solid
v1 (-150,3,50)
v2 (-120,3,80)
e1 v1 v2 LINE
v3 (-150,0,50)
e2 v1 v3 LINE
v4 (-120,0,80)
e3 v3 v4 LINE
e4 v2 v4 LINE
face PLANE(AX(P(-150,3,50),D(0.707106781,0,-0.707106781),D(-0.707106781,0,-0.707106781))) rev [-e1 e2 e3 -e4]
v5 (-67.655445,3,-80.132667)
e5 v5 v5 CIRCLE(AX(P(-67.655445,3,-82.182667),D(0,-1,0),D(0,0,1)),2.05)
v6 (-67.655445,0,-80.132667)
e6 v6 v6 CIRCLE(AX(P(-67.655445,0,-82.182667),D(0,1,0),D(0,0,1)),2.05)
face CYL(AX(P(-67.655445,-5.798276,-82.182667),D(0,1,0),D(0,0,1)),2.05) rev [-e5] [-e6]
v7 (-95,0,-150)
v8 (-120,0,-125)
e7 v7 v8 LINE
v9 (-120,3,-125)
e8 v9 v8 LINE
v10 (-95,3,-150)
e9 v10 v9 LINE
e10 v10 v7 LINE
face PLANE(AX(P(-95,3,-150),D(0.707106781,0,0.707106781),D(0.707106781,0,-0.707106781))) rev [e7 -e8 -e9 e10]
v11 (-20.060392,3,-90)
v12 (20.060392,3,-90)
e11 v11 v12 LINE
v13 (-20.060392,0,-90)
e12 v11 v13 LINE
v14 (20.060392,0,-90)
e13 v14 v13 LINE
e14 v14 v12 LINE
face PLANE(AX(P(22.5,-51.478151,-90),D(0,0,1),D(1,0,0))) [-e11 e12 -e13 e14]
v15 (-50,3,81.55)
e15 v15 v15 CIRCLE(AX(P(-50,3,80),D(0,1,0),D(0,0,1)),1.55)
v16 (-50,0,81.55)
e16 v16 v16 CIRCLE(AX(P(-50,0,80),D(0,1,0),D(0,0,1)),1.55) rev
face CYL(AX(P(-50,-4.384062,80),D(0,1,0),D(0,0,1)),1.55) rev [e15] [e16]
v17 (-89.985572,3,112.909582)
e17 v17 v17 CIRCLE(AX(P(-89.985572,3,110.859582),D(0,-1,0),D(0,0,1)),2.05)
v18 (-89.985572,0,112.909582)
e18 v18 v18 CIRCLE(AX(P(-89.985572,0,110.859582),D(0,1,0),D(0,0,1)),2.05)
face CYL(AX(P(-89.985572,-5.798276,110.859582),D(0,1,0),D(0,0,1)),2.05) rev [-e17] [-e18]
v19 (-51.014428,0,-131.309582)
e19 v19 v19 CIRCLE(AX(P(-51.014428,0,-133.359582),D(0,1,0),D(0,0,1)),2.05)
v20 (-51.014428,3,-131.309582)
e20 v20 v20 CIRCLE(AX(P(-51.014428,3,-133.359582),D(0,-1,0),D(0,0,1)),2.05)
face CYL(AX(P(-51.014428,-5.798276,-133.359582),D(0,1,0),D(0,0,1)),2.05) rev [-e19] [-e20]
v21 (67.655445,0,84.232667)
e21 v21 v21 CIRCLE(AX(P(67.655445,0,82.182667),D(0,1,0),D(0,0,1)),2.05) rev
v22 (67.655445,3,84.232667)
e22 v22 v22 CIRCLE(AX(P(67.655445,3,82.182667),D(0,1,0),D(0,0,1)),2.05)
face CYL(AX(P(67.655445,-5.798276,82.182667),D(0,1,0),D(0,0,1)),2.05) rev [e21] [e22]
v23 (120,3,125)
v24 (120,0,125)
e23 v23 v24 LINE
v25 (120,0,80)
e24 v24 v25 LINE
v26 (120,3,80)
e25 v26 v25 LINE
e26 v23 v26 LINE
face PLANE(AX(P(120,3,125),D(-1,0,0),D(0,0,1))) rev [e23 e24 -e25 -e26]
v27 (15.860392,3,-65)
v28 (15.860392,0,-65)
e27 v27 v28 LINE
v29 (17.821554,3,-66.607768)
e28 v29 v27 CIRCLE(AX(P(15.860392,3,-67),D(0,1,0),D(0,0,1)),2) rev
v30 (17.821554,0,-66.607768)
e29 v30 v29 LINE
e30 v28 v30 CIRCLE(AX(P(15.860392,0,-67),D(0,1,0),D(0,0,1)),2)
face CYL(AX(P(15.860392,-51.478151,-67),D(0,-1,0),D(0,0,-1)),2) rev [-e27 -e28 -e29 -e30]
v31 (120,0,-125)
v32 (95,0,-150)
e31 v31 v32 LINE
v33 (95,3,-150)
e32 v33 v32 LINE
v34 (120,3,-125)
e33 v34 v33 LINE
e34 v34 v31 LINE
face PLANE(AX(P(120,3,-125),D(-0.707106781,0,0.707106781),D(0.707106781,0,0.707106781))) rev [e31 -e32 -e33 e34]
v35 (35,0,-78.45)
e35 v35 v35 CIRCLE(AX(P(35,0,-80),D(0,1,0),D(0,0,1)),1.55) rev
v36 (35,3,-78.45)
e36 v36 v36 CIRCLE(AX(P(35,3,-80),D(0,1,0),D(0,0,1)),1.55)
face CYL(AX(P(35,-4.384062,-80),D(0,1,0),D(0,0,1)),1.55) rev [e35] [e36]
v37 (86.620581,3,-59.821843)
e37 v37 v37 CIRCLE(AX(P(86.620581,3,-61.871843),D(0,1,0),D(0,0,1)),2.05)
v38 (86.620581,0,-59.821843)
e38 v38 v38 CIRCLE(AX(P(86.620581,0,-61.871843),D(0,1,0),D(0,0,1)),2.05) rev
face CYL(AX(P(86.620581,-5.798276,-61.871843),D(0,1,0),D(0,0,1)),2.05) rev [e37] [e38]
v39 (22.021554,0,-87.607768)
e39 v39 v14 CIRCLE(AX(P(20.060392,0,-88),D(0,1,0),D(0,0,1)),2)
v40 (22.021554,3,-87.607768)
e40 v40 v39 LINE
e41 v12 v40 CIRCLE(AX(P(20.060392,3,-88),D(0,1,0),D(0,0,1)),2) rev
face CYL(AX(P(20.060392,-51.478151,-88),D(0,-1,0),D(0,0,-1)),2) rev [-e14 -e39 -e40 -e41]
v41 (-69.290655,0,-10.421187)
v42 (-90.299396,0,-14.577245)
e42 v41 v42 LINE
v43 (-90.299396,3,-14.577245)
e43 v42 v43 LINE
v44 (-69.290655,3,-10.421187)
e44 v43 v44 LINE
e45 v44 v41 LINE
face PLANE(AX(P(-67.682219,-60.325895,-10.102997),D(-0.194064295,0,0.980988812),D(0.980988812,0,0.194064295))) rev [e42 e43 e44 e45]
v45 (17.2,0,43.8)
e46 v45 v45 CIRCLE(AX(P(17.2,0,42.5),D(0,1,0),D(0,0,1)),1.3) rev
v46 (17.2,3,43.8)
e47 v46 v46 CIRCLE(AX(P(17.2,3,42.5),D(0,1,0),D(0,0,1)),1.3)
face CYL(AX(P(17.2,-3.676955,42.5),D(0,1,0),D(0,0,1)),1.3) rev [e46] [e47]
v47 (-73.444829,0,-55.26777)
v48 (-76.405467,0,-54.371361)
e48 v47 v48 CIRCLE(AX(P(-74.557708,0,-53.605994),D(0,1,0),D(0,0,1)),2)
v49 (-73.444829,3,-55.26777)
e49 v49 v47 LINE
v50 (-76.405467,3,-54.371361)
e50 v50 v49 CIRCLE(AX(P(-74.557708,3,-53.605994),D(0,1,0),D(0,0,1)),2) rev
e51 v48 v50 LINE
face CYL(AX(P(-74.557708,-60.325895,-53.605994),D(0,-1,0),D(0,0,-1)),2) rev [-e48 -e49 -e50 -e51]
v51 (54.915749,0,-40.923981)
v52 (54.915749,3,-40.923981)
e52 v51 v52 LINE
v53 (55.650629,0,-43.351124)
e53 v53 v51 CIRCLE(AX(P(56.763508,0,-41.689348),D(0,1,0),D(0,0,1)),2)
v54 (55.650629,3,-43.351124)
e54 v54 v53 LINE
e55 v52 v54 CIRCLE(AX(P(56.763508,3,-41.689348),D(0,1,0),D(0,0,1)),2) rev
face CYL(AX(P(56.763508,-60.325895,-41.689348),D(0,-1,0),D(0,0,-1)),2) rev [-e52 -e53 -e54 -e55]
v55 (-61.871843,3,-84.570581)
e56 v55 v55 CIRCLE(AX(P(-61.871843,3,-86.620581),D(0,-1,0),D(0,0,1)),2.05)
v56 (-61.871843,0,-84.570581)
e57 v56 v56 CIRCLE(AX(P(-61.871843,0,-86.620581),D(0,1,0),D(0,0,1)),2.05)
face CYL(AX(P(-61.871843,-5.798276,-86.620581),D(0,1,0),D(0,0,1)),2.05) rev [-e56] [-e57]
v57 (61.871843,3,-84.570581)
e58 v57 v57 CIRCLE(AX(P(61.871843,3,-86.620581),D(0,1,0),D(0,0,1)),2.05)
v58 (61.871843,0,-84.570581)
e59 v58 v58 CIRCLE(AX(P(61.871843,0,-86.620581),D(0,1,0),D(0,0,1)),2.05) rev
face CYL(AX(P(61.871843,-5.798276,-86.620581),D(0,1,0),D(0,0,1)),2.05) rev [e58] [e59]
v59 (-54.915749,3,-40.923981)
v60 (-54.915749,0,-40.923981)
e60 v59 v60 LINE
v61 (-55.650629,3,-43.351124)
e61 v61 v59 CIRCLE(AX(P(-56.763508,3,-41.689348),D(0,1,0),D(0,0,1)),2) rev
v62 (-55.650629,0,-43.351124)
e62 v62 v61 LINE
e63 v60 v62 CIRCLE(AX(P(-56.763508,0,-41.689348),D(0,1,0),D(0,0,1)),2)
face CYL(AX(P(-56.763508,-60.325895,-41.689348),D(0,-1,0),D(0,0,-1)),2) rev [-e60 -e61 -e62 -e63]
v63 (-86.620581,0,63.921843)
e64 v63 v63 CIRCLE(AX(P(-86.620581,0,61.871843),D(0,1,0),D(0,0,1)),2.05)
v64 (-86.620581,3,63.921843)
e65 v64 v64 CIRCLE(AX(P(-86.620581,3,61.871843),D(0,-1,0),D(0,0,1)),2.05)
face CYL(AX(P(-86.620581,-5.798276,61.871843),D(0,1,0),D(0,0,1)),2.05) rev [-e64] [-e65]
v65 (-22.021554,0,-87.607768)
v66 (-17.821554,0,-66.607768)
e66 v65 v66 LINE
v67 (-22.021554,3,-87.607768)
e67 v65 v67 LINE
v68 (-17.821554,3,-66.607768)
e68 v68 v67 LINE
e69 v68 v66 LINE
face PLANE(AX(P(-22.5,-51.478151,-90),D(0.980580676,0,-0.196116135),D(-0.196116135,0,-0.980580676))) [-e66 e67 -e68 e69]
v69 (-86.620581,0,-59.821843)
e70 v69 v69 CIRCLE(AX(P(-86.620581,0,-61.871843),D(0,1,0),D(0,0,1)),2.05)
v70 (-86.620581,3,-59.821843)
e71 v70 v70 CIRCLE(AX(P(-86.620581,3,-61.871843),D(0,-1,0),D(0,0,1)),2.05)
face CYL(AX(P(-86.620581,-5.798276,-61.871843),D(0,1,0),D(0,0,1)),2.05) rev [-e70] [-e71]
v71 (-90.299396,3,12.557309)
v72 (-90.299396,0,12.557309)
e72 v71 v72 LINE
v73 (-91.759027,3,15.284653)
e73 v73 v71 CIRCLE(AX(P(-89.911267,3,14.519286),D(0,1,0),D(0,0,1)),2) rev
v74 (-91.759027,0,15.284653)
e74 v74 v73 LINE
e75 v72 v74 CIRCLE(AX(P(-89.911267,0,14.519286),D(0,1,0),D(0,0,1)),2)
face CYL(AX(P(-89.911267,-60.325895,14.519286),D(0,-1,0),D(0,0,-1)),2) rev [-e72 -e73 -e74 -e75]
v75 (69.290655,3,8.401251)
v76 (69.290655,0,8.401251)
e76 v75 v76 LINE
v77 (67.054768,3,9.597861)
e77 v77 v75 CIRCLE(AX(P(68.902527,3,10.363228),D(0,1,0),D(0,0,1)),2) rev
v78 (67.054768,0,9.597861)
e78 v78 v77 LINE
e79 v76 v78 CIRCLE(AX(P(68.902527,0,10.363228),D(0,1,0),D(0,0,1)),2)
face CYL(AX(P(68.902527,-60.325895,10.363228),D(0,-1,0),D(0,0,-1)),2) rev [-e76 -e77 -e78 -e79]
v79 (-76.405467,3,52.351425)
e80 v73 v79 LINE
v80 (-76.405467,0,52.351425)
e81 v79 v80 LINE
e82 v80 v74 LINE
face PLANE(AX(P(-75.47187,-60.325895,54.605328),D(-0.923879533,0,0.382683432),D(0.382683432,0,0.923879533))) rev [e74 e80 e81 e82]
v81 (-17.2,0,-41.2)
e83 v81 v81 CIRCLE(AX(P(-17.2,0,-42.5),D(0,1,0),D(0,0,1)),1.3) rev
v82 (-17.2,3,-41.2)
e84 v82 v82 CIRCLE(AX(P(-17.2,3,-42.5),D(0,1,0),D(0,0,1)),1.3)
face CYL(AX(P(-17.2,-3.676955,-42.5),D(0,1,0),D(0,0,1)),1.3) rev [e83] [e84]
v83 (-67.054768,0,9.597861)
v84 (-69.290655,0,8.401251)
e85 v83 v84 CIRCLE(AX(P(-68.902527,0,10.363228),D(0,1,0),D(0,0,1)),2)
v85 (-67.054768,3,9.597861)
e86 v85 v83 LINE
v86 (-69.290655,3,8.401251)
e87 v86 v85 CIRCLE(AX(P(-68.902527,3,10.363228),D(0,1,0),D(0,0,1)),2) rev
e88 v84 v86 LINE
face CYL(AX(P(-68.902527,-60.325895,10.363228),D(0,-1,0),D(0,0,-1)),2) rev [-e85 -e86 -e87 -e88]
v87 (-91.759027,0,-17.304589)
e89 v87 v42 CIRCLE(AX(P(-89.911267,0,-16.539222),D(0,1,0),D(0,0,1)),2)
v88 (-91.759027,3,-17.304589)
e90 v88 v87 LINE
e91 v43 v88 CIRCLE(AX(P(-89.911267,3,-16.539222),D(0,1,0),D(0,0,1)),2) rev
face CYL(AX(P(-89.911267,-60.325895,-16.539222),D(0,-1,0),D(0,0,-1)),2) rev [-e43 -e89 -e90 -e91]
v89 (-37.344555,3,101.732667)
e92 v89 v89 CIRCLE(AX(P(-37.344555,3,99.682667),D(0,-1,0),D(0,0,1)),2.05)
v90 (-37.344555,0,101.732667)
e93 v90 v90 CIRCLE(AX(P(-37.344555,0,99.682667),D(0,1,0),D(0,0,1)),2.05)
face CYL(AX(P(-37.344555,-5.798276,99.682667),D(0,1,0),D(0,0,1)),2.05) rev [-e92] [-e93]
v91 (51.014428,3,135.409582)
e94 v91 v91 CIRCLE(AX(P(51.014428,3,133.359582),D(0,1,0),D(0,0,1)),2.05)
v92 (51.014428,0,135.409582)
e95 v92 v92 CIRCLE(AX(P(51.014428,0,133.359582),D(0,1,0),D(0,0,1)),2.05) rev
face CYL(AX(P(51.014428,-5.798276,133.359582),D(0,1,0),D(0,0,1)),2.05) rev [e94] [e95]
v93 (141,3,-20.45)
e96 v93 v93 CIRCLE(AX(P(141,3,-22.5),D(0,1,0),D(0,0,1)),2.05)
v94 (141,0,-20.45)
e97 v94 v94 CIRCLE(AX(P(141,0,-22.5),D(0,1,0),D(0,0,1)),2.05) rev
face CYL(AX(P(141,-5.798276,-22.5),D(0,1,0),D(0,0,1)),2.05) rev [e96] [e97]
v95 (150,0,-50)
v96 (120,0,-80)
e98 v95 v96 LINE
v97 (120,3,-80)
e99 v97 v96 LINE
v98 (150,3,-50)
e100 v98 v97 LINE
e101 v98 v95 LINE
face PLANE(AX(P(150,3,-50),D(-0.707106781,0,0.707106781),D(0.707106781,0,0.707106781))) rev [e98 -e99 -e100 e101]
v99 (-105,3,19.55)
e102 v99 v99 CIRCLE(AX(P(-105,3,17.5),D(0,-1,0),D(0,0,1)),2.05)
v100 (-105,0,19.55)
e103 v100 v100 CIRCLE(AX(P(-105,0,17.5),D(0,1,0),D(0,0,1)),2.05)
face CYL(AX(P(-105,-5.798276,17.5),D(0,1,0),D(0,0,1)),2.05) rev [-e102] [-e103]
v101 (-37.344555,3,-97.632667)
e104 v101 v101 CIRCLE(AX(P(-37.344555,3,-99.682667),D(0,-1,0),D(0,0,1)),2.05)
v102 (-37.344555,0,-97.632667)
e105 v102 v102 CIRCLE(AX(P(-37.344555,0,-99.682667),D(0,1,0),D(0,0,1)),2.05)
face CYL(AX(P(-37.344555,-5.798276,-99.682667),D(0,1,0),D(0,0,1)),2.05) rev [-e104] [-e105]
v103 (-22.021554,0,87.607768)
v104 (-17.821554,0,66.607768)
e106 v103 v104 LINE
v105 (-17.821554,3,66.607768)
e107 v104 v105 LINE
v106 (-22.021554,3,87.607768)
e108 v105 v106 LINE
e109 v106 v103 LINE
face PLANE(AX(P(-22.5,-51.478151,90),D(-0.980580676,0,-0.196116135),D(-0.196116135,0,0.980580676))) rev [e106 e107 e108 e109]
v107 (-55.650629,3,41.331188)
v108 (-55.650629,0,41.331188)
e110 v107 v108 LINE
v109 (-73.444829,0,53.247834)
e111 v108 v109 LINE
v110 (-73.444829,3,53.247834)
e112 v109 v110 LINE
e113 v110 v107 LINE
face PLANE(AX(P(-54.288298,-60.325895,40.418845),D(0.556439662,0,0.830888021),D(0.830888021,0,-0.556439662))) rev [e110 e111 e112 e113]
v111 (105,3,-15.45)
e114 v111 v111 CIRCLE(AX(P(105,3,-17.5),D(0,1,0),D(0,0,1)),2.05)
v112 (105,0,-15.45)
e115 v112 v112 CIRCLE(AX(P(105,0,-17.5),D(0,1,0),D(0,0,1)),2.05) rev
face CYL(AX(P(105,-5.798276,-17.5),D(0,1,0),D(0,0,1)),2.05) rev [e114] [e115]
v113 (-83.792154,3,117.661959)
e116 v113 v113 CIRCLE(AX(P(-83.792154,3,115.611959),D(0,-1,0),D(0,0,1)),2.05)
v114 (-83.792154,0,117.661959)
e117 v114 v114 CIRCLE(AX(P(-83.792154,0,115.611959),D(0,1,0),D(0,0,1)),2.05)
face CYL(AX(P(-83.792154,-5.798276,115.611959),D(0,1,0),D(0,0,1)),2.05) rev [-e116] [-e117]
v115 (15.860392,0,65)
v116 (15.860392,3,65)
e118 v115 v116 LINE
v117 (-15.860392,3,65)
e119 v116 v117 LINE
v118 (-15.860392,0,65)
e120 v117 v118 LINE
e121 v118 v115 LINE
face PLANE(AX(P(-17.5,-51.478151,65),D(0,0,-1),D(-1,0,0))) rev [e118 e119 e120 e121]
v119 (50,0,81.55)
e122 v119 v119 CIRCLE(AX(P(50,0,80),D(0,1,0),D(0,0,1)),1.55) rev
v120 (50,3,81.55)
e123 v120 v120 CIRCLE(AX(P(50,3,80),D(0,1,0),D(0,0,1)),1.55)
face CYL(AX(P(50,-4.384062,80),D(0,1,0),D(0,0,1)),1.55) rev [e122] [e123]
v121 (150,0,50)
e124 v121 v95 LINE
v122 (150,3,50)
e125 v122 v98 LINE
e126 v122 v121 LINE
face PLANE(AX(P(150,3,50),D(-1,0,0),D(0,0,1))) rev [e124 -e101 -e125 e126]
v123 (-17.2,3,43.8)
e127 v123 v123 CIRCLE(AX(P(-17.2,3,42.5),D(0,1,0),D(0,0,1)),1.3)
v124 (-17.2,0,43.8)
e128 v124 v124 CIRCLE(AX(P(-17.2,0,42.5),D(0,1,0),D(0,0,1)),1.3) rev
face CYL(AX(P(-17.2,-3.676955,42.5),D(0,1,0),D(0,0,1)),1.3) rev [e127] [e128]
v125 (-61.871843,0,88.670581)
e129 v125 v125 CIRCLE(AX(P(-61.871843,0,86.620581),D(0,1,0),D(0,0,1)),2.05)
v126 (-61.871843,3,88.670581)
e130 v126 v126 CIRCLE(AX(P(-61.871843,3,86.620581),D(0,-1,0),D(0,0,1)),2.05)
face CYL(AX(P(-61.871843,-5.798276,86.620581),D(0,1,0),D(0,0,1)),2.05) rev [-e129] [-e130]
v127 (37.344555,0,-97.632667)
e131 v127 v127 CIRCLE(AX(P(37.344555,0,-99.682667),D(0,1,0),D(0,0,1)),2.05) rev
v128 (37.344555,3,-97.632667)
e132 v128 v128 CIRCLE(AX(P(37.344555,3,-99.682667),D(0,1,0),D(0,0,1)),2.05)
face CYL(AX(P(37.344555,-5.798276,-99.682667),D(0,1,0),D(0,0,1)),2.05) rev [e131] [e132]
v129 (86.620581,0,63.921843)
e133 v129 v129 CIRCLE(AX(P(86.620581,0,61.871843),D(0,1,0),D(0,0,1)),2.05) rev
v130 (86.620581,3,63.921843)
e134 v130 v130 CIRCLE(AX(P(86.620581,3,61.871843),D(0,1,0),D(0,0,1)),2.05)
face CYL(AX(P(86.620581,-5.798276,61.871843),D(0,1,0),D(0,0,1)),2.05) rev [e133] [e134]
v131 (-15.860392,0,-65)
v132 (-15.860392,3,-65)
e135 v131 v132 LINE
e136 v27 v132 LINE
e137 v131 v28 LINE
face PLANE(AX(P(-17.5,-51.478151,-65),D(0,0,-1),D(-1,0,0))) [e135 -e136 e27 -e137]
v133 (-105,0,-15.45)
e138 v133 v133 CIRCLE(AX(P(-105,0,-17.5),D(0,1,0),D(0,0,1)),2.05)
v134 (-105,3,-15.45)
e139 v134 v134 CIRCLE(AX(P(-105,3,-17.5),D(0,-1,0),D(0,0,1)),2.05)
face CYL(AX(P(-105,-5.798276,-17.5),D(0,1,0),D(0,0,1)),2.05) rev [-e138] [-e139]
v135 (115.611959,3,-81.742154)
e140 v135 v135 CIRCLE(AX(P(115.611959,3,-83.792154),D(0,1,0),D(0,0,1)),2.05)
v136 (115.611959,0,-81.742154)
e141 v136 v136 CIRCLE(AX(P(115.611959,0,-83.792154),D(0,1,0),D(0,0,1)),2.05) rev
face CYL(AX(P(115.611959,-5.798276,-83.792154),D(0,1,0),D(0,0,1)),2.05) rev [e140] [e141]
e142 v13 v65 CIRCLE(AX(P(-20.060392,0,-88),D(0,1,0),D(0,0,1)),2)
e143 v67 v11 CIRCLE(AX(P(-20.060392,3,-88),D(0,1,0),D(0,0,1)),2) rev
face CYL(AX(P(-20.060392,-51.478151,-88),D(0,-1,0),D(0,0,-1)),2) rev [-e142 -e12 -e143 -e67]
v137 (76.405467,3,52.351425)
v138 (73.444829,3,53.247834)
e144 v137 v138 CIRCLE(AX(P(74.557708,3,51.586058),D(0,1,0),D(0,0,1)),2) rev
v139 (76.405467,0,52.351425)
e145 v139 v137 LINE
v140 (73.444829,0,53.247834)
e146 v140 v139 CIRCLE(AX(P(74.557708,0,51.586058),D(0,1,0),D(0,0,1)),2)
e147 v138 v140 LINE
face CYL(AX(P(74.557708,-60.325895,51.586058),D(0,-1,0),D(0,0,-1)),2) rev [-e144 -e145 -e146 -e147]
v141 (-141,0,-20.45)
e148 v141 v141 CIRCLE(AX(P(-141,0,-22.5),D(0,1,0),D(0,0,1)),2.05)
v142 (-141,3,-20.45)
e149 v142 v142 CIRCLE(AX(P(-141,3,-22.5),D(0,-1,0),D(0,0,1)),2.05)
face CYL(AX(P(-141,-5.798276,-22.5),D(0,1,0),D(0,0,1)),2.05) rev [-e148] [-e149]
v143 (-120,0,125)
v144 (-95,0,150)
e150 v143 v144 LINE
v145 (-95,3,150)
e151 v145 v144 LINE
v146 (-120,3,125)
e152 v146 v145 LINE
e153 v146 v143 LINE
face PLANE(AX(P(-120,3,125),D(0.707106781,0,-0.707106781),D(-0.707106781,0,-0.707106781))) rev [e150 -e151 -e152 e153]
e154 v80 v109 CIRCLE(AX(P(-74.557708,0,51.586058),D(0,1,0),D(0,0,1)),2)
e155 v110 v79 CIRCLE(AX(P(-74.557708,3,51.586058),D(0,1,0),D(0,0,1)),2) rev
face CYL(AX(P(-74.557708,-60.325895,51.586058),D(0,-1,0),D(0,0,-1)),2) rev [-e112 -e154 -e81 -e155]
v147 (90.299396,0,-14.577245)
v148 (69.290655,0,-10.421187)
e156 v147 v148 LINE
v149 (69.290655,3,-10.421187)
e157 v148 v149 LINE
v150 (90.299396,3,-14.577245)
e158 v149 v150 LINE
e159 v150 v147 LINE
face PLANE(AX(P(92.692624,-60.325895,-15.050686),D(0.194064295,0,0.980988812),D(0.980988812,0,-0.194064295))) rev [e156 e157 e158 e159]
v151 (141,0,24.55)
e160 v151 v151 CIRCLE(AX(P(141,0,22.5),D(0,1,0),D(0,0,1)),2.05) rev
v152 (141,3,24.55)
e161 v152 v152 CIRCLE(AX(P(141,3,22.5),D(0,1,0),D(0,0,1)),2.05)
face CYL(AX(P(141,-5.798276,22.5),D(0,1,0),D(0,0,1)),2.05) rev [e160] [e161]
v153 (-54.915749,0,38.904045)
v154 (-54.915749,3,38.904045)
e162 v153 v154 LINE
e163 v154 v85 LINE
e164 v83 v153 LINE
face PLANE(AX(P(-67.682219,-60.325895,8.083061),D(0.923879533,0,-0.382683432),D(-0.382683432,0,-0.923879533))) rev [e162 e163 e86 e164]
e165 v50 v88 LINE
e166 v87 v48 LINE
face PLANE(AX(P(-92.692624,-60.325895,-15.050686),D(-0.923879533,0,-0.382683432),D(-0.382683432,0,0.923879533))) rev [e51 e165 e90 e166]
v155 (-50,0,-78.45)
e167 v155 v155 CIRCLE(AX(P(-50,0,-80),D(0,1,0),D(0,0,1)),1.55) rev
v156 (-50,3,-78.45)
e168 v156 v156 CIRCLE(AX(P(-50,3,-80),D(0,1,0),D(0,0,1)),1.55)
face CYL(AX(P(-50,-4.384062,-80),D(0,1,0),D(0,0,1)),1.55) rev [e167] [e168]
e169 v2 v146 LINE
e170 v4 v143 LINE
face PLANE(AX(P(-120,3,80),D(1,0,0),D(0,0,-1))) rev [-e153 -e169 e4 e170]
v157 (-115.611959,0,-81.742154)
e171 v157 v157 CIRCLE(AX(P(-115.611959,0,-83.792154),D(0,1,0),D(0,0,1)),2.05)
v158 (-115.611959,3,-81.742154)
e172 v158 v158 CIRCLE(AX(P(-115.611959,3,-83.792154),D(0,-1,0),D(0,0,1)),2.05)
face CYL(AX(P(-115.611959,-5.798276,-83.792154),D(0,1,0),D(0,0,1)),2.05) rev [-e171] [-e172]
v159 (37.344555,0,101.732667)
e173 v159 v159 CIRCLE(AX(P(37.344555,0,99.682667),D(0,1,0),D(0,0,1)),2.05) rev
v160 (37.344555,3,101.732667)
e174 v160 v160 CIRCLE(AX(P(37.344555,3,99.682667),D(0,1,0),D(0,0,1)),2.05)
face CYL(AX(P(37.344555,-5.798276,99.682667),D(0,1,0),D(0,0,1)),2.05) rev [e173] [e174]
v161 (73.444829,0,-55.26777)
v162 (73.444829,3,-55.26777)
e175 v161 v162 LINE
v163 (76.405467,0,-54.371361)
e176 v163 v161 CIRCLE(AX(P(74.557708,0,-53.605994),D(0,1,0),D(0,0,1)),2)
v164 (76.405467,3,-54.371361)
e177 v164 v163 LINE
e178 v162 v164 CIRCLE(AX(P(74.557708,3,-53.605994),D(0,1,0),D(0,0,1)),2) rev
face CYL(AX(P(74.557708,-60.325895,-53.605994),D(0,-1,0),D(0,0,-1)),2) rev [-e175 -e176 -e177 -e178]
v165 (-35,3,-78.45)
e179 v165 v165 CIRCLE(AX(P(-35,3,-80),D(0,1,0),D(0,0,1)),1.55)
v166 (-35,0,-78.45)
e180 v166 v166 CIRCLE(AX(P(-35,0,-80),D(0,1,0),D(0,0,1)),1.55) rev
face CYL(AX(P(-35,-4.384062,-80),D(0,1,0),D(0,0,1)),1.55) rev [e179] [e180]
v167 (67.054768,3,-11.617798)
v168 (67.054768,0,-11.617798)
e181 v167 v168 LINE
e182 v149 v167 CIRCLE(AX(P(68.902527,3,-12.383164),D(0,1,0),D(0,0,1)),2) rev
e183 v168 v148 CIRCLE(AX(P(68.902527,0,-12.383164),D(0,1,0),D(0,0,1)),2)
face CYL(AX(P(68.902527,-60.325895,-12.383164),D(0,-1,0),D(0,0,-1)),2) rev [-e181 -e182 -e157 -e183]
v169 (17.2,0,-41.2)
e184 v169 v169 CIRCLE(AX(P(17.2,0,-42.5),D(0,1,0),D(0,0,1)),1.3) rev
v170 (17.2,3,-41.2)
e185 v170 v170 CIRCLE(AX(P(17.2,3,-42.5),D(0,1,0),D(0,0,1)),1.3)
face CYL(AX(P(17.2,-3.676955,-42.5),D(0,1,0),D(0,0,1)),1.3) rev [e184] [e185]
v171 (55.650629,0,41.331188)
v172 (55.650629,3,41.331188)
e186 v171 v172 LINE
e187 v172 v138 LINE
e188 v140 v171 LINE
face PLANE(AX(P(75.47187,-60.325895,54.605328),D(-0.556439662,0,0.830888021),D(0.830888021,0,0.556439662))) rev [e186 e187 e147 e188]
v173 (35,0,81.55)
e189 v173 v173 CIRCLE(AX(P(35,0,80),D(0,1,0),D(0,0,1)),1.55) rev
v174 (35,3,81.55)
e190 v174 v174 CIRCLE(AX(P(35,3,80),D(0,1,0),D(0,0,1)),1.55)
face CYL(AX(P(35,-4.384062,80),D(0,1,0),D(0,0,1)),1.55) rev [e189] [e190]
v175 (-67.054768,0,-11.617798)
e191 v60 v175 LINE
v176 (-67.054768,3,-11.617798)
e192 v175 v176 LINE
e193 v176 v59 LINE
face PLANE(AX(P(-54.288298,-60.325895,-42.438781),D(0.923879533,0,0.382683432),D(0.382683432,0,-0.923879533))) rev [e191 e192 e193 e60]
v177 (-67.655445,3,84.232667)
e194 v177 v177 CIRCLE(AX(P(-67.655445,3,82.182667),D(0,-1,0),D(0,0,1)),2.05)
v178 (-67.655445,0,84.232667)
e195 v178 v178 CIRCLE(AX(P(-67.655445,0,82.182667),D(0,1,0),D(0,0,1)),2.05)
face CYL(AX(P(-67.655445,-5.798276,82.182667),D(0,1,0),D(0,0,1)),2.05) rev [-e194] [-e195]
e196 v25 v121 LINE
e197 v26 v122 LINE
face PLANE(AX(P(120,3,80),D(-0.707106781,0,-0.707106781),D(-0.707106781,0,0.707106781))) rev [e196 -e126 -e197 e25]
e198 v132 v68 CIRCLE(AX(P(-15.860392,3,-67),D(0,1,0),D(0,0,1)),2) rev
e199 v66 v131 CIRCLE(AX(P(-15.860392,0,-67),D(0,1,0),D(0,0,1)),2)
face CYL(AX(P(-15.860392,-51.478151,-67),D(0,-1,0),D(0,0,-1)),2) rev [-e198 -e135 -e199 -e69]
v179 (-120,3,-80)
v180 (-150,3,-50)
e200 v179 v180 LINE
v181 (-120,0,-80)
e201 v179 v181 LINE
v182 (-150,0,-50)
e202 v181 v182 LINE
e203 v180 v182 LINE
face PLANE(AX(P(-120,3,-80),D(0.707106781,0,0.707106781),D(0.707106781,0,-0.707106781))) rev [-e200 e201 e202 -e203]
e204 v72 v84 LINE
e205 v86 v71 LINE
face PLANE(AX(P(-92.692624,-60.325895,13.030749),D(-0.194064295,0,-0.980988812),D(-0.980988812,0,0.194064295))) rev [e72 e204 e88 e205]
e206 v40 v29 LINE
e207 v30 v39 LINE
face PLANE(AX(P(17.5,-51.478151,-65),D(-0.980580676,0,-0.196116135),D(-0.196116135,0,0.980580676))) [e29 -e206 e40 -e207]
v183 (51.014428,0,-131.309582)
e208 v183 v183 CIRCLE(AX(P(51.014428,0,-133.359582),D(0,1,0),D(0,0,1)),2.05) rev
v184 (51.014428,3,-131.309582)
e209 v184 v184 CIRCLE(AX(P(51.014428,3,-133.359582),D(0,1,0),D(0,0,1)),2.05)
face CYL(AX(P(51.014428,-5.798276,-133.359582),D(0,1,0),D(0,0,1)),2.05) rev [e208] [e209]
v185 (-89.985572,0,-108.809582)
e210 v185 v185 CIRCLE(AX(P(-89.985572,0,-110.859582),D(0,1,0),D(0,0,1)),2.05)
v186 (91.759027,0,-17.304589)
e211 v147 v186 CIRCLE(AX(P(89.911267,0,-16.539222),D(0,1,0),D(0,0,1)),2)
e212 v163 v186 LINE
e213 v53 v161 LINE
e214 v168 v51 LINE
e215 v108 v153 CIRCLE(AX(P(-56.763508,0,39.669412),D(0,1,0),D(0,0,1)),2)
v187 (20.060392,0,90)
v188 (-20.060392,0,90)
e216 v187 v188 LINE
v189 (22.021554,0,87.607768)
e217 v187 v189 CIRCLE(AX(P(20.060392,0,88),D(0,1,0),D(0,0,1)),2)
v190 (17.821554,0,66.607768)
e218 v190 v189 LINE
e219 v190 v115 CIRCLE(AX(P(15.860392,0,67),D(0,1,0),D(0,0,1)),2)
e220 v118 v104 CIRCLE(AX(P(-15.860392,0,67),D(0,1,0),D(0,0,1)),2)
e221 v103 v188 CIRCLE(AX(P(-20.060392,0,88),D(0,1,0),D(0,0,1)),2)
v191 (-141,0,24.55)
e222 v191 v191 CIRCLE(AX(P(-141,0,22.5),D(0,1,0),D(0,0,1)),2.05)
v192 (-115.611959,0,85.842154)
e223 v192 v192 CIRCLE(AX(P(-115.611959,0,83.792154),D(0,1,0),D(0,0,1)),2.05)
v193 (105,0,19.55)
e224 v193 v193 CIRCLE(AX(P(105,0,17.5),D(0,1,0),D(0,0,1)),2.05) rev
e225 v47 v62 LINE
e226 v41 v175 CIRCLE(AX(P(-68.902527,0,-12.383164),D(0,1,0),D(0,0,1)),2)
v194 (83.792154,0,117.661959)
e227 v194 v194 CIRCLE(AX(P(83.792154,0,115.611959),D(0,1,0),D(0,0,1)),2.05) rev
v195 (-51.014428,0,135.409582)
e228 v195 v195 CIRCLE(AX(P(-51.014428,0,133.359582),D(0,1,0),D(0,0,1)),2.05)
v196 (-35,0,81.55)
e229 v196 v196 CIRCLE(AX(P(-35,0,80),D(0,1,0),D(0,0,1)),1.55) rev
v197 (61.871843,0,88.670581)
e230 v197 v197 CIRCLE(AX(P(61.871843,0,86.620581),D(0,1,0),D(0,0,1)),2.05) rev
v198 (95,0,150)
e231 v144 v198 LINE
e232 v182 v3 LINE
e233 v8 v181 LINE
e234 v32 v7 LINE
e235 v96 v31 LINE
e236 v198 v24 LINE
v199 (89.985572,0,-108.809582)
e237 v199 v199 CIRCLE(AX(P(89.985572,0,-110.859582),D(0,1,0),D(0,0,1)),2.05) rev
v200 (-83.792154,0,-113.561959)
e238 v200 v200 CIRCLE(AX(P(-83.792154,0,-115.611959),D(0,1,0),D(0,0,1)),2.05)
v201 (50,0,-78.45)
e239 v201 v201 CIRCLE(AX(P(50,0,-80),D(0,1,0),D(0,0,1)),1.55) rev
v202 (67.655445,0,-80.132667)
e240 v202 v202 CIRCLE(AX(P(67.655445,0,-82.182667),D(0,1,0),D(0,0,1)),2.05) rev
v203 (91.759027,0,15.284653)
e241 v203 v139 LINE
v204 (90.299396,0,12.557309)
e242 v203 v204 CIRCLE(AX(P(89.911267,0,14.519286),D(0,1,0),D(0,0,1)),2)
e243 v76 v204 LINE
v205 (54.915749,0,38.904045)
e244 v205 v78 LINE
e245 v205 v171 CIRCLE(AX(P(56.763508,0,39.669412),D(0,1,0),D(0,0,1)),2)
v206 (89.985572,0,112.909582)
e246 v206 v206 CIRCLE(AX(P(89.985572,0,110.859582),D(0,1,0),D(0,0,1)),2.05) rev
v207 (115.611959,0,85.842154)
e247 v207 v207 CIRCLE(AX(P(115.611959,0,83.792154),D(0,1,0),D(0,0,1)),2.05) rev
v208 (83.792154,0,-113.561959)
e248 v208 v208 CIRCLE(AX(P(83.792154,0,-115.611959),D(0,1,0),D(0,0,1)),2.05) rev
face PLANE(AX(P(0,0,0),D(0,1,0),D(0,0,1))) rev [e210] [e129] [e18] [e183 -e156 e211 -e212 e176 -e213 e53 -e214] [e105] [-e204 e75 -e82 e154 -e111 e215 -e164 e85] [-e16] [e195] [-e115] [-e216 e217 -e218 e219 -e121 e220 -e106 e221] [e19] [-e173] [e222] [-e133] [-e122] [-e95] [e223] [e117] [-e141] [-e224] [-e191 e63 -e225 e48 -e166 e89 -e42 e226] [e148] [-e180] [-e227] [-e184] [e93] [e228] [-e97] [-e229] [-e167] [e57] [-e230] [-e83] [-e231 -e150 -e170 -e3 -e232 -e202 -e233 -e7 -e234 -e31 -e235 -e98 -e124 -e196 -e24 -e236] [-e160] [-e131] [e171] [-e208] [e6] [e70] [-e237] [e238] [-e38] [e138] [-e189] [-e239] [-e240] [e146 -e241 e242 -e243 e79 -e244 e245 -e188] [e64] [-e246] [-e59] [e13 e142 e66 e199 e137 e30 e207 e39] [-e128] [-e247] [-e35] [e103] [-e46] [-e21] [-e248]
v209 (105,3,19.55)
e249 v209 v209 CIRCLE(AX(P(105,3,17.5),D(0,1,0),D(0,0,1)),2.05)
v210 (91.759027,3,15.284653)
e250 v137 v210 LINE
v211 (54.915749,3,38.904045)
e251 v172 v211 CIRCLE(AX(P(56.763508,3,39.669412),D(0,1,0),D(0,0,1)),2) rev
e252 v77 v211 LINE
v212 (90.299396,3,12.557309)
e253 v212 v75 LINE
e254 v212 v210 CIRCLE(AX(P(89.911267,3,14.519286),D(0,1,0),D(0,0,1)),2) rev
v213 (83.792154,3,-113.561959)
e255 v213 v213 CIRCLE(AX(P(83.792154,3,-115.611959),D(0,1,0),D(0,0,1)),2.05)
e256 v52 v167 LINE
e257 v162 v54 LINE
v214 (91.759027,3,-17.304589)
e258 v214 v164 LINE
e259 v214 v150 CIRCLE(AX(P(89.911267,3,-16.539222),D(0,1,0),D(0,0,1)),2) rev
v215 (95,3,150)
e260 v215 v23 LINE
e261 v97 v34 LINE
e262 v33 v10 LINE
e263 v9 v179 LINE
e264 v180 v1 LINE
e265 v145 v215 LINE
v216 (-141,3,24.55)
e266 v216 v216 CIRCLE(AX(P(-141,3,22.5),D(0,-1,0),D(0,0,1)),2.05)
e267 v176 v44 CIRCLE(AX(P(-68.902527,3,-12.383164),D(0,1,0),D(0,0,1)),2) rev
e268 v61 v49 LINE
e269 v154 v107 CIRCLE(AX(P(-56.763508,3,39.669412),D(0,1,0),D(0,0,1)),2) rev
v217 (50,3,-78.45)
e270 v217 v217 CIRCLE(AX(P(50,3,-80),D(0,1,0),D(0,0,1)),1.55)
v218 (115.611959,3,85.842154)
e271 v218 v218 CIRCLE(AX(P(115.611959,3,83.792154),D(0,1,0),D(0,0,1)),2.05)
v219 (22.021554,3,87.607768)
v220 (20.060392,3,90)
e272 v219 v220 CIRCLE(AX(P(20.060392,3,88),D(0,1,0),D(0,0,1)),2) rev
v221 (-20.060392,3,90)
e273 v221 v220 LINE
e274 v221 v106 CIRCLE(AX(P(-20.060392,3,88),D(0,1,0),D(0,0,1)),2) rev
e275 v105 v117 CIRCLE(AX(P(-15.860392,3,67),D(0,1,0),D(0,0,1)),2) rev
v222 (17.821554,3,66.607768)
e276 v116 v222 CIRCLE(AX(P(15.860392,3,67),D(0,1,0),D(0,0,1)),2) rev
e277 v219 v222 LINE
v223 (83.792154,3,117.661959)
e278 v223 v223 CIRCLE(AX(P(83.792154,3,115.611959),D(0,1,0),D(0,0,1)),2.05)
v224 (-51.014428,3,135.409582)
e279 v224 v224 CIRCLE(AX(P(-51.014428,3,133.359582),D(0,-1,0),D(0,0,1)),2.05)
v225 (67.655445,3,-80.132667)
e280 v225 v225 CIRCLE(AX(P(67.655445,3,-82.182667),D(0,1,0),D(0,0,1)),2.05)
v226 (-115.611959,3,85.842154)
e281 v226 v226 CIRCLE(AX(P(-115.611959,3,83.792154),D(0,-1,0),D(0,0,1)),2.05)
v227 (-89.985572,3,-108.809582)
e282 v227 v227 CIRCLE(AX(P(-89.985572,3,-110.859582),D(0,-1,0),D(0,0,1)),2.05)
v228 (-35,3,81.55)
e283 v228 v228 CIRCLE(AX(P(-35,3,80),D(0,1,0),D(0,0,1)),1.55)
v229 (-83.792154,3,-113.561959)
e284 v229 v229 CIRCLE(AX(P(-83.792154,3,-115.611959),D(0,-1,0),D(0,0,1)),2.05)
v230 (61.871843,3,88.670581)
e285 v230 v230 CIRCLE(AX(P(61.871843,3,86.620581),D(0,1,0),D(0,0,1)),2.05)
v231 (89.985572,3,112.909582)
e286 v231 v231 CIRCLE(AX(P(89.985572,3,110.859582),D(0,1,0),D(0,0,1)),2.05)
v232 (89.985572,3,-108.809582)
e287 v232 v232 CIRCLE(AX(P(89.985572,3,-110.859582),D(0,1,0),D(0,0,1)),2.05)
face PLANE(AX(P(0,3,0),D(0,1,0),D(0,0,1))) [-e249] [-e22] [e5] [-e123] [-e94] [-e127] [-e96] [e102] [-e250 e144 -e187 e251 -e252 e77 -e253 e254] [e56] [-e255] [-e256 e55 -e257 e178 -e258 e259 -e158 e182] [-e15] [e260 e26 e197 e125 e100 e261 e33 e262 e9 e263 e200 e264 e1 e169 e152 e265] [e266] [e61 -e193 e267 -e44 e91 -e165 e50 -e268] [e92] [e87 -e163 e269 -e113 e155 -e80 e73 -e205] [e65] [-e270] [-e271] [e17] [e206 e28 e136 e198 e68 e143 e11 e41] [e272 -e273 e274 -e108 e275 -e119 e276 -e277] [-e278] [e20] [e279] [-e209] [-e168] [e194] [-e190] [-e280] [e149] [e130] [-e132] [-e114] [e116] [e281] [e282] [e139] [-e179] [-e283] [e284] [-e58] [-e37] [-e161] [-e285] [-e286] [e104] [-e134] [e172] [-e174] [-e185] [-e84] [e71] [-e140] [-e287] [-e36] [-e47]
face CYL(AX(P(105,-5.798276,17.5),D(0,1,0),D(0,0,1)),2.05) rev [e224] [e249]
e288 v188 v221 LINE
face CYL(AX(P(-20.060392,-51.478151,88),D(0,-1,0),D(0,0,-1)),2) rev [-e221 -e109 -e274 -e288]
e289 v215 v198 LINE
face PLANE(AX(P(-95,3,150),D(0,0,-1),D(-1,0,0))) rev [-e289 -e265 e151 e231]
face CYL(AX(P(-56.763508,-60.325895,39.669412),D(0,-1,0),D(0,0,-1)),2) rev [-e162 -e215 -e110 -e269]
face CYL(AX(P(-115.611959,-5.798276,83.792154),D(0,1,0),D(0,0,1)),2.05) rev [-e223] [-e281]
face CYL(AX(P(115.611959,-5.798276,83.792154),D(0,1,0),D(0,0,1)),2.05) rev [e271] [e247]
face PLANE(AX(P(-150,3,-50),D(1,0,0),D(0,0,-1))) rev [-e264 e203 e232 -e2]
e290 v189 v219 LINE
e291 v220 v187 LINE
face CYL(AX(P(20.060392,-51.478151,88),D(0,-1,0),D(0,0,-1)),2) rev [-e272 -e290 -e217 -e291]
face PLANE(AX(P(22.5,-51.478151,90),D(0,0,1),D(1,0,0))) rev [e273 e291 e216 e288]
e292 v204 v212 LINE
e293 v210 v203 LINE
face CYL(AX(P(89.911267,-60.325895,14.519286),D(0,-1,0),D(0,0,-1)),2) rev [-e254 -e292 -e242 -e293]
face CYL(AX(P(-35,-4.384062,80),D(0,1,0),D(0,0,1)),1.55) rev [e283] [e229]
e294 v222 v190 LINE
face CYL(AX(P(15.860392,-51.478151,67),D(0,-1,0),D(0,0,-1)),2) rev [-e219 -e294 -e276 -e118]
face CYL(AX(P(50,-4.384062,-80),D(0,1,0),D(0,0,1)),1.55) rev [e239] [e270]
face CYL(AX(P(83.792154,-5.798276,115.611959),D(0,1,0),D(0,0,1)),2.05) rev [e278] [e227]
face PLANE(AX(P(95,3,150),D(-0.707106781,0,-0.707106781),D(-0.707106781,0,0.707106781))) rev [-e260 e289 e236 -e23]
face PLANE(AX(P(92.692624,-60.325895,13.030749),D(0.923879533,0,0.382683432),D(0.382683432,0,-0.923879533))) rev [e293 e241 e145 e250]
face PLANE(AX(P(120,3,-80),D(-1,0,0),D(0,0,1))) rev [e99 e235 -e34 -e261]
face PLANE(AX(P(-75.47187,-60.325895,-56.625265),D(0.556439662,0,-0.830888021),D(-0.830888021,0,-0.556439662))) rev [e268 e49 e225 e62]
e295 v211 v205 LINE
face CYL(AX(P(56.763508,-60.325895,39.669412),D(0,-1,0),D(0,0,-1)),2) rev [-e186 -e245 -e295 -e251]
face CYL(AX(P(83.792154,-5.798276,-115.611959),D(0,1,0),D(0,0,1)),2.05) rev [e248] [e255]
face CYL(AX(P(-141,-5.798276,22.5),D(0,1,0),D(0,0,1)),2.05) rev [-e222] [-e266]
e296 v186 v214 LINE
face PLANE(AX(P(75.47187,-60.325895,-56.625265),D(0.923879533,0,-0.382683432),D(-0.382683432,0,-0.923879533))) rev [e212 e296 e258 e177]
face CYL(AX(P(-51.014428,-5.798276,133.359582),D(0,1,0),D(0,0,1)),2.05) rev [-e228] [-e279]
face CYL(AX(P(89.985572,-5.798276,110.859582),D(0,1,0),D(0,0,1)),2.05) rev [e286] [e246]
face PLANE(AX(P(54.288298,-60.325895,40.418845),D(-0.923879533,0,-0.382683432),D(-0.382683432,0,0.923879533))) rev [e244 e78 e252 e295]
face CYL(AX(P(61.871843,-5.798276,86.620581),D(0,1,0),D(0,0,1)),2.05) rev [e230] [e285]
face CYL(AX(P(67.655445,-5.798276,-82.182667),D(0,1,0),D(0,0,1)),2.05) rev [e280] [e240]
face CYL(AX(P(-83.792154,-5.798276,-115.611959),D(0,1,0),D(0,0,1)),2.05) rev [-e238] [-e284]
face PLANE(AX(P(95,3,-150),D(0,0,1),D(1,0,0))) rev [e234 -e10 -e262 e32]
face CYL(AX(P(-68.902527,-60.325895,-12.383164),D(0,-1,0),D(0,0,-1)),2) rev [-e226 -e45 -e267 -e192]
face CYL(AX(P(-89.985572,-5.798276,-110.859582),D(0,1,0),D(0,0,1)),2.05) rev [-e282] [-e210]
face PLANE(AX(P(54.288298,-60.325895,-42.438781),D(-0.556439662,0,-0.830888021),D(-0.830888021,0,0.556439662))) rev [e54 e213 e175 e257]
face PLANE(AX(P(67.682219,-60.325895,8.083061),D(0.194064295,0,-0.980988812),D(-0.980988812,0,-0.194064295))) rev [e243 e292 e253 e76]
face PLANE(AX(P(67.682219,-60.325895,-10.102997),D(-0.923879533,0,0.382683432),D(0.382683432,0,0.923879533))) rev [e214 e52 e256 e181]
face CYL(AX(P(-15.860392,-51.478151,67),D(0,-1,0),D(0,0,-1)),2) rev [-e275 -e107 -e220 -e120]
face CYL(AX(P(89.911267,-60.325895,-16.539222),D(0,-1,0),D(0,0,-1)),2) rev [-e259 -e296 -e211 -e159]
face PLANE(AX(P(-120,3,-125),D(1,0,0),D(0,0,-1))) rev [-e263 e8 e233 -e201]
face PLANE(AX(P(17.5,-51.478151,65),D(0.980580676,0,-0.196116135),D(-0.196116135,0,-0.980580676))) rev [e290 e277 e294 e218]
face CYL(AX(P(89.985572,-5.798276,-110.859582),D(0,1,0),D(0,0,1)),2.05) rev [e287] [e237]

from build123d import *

# Parameters (mm, degrees)
BOSS_EXTRUDE1_DEPTH    = 3
SKETCH2_R              = 2.05
HEXCUT1_DEPTH          = 3
SKETCH5_R              = 1.55
CUT_EXTRUDE2_DEPTH     = 3
LPATTERN1_COUNT        = 2
LPATTERN1_PITCH        = 160
LPATTERN1_COUNT_DIR2   = 2
LPATTERN1_PITCH_DIR2   = 85
SKETCH6_R              = 2.05
QUADCUT1_DEPTH         = 3
SKETCH7_R              = 1.3
STDCARRIERCUBEFP_DEPTH = 3
CUT_EXTRUDE3_DEPTH     = 3
FILLET1_R              = 2
CIRPATTERN1_DEPTH      = 3
FILLET1_OF_MIRROR1_R   = 2


# Read off the part's stored shape, not the designer's step: CirPattern1
with BuildPart() as part:
    # Sketch1 → Boss-Extrude1 (new body)
    with BuildSketch(Plane(origin=(0, 0, 0), x_dir=(1, 0, 0), z_dir=(0, 1, 0))):
        Polygon((-95, 150), (-120, 125), (-120, 80), (-150, 50), (-150, -50), (-120, -80), (-120, -125), (-95, -150), (95, -150), (120, -125), (120, -80), (150, -50), (150, 50), (120, 80), (120, 125), (95, 150), align=None)
    extrude(amount=BOSS_EXTRUDE1_DEPTH)

    # Sketch2 → HexCut1 (cut)
    with BuildSketch(Plane(origin=(0, 3, 0), x_dir=(1, 0, 0), z_dir=(0, 1, 0))):
        with Locations(Location((51.014428415, 133.359581934, 0), (0, 0, 270))):
            Circle(SKETCH2_R)
        with Locations(Location((37.344555434, 99.682667397, 0), (0, 0, 270))):
            Circle(SKETCH2_R)
        with Locations(Location((37.344555434, -99.682667397, 0), (0, 0, 270))):
            Circle(SKETCH2_R)
        with Locations(Location((51.014428415, -133.359581934, 0), (0, 0, 270))):
            Circle(SKETCH2_R)
        with Locations(Location((105, 17.5, 0), (0, 0, 270))):
            Circle(SKETCH2_R)
        with Locations(Location((141, 22.5, 0), (0, 0, 270))):
            Circle(SKETCH2_R)
        with Locations(Location((105, -17.5, 0), (0, 0, 270))):
            Circle(SKETCH2_R)
        with Locations(Location((141, -22.5, 0), (0, 0, 270))):
            Circle(SKETCH2_R)
        with Locations(Location((89.985571585, -110.859581934, 0), (0, 0, 270))):
            Circle(SKETCH2_R)
        with Locations(Location((67.655444566, -82.182667397, 0), (0, 0, 270))):
            Circle(SKETCH2_R)
        with Locations(Location((89.985571585, 110.859581934, 0), (0, 0, 270))):
            Circle(SKETCH2_R)
        with Locations(Location((67.655444566, 82.182667397, 0), (0, 0, 270))):
            Circle(SKETCH2_R)
    hexcut1 = extrude(amount=-HEXCUT1_DEPTH, mode=Mode.SUBTRACT)

    # HexCut2: HexCut1 across plane
    add(hexcut1.mirror(Plane(origin=(0, 0, 0), x_dir=(0, 0, 1), z_dir=(1, 0, 0))), mode=Mode.SUBTRACT)

    # Sketch5 → Cut-Extrude2 (cut)
    with BuildSketch(Plane(origin=(0, 3, 0), x_dir=(1, 0, 0), z_dir=(0, 1, 0))):
        with Locations(Location((35, 80, 0), (0, 0, 270))):
            Circle(SKETCH5_R)
        with Locations(Location((50, 80, 0), (0, 0, 270))):
            Circle(SKETCH5_R)
    cut_extrude2 = extrude(amount=-CUT_EXTRUDE2_DEPTH, mode=Mode.SUBTRACT)

    # LPattern1: Cut-Extrude2 2 × 2
    with Locations(*[(-j * LPATTERN1_PITCH_DIR2, 0, i * LPATTERN1_PITCH) for i in range(LPATTERN1_COUNT) for j in range(LPATTERN1_COUNT_DIR2) if (i, j) != (0, 0)]):
        add(cut_extrude2, mode=Mode.SUBTRACT)

    # Sketch6 → QuadCut1 (cut)
    with BuildSketch(Plane(origin=(0, 3, 0), x_dir=(1, 0, 0), z_dir=(0, 1, 0))):
        with Locations(Location((86.620580695, 61.871843354, 0), (0, 0, 270))):
            Circle(SKETCH6_R)
        with Locations(Location((115.611958724, 83.792153571, 0), (0, 0, 270))):
            Circle(SKETCH6_R)
        with Locations(Location((83.792153571, 115.611958724, 0), (0, 0, 270))):
            Circle(SKETCH6_R)
        with Locations(Location((61.871843354, 86.620580695, 0), (0, 0, 270))):
            Circle(SKETCH6_R)
        with Locations(Location((86.620580695, -61.871843354, 0), (0, 0, 270))):
            Circle(SKETCH6_R)
        with Locations(Location((61.871843354, -86.620580695, 0), (0, 0, 270))):
            Circle(SKETCH6_R)
        with Locations(Location((83.792153571, -115.611958724, 0), (0, 0, 270))):
            Circle(SKETCH6_R)
        with Locations(Location((115.611958724, -83.792153571, 0), (0, 0, 270))):
            Circle(SKETCH6_R)
    quadcut1 = extrude(amount=-QUADCUT1_DEPTH, mode=Mode.SUBTRACT)

    # QuadCut2: QuadCut1 across plane
    add(quadcut1.mirror(Plane(origin=(0, 0, 0), x_dir=(0, 0, 1), z_dir=(1, 0, 0))), mode=Mode.SUBTRACT)

    # Sketch7 → StdCarrierCubeFP (cut)
    with BuildSketch(Plane(origin=(0, 3, 0), x_dir=(1, 0, 0), z_dir=(0, 1, 0))):
        with Locations(Location((-17.2, 42.5, 0), (0, 0, 270))):
            Circle(SKETCH7_R)
        with Locations(Location((17.2, 42.5, 0), (0, 0, 270))):
            Circle(SKETCH7_R)
        with Locations(Location((-17.2, -42.5, 0), (0, 0, 270))):
            Circle(SKETCH7_R)
        with Locations(Location((17.2, -42.5, 0), (0, 0, 270))):
            Circle(SKETCH7_R)
    extrude(amount=-STDCARRIERCUBEFP_DEPTH, mode=Mode.SUBTRACT)

    # Sketch8 → Cut-Extrude3 (cut)
    with BuildSketch(Plane(origin=(0, 3, 0), x_dir=(1, 0, 0), z_dir=(0, 1, 0))):
        Polygon((-17.5, -65), (17.5, -65), (22.5, -90), (-22.5, -90), align=None)
    cut_extrude3 = extrude(amount=-CUT_EXTRUDE3_DEPTH, mode=Mode.SUBTRACT)

    # Fillet1
    fillet1_edges = [part.edges().sort_by_distance(p)[0] for p in [
        (-22.5, 1.5, 90),
        (-17.5, 1.5, 65),
        (17.5, 1.5, 65),
        (22.5, 1.5, 90),
    ]]
    fillet(fillet1_edges, radius=FILLET1_R)

    # CirPattern1 outline → CirPattern1 (cut)
    with BuildSketch(Plane(origin=(0, 0, 0), x_dir=(1, 0, 0), z_dir=(0, 1, 0))):
        with BuildLine():
            ThreePointArc((54.915749171, -38.904044772), (54.849324183, -40.248979934), (55.650628912, -41.331187678))
            Line((55.650628912, -41.331187678), (73.444828679, -53.247833794))
            ThreePointArc((73.444828679, -53.247833794), (75.1372763, -53.500241806), (76.405467068, -52.351424618))
            Line((76.405467068, -52.351424618), (91.759026547, -15.284653092))
            ThreePointArc((91.759026547, -15.284653092), (91.67461668, -13.575570376), (90.299396073, -12.557308603))
            Line((90.299396073, -12.557308603), (69.290655474, -8.40125056))
            ThreePointArc((69.290655474, -8.40125056), (67.958811033, -8.599878987), (67.054767819, -9.59786132))
            Line((67.054767819, -9.59786132), (54.915749171, -38.904044772))
        make_face()
        with BuildLine():
            ThreePointArc((67.054767819, 11.617797575), (67.958811032, 10.619815242), (69.290655474, 10.421186816))
            Line((69.290655474, 10.421186816), (90.299396073, 14.577244859))
            ThreePointArc((90.299396073, 14.577244859), (91.67461668, 15.595506632), (91.759026547, 17.304589348))
            Line((91.759026547, 17.304589348), (76.405467068, 54.371360873))
            ThreePointArc((76.405467068, 54.371360873), (75.1372763, 55.520178061), (73.444828679, 55.267770049))
            Line((73.444828679, 55.267770049), (55.650628912, 43.351123933))
            ThreePointArc((55.650628912, 43.351123933), (54.849324183, 42.268916189), (54.915749171, 40.923981027))
            Line((54.915749171, 40.923981027), (67.054767819, 11.617797575))
        make_face()
        with BuildLine():
            ThreePointArc((-54.915749171, 40.923981027), (-54.849324183, 42.268916189), (-55.650628912, 43.351123933))
            Line((-55.650628912, 43.351123933), (-73.444828679, 55.267770049))
            ThreePointArc((-73.444828679, 55.267770049), (-75.1372763, 55.520178061), (-76.405467068, 54.371360873))
            Line((-76.405467068, 54.371360873), (-91.759026547, 17.304589348))
            ThreePointArc((-91.759026547, 17.304589348), (-91.67461668, 15.595506632), (-90.299396073, 14.577244859))
            Line((-90.299396073, 14.577244859), (-69.290655474, 10.421186816))
            ThreePointArc((-69.290655474, 10.421186816), (-67.958811032, 10.619815242), (-67.054767819, 11.617797575))
            Line((-67.054767819, 11.617797575), (-54.915749171, 40.923981027))
        make_face()
        with BuildLine():
            ThreePointArc((-67.054767819, -9.59786132), (-67.958811033, -8.599878987), (-69.290655474, -8.40125056))
            Line((-69.290655474, -8.40125056), (-90.299396073, -12.557308603))
            ThreePointArc((-90.299396073, -12.557308603), (-91.67461668, -13.575570376), (-91.759026547, -15.284653092))
            Line((-91.759026547, -15.284653092), (-76.405467068, -52.351424618))
            ThreePointArc((-76.405467068, -52.351424618), (-75.1372763, -53.500241806), (-73.444828679, -53.247833794))
            Line((-73.444828679, -53.247833794), (-55.650628912, -41.331187678))
            ThreePointArc((-55.650628912, -41.331187678), (-54.849324183, -40.248979934), (-54.915749171, -38.904044772))
            Line((-54.915749171, -38.904044772), (-67.054767819, -9.59786132))
        make_face()
    extrude(amount=CIRPATTERN1_DEPTH, mode=Mode.SUBTRACT)

    # Mirror1: Cut-Extrude3 across plane
    add(cut_extrude3.mirror(Plane.XY), mode=Mode.SUBTRACT)

    # Fillet1 of Mirror1
    fillet1_of_mirror1_edges = [part.edges().sort_by_distance(p)[0] for p in [
        (-22.5, 1.5, -90),
        (-17.5, 1.5, -65),
        (17.5, 1.5, -65),
        (22.5, 1.5, -90),
    ]]
    fillet(fillet1_of_mirror1_edges, radius=FILLET1_OF_MIRROR1_R)


solid = part.part
